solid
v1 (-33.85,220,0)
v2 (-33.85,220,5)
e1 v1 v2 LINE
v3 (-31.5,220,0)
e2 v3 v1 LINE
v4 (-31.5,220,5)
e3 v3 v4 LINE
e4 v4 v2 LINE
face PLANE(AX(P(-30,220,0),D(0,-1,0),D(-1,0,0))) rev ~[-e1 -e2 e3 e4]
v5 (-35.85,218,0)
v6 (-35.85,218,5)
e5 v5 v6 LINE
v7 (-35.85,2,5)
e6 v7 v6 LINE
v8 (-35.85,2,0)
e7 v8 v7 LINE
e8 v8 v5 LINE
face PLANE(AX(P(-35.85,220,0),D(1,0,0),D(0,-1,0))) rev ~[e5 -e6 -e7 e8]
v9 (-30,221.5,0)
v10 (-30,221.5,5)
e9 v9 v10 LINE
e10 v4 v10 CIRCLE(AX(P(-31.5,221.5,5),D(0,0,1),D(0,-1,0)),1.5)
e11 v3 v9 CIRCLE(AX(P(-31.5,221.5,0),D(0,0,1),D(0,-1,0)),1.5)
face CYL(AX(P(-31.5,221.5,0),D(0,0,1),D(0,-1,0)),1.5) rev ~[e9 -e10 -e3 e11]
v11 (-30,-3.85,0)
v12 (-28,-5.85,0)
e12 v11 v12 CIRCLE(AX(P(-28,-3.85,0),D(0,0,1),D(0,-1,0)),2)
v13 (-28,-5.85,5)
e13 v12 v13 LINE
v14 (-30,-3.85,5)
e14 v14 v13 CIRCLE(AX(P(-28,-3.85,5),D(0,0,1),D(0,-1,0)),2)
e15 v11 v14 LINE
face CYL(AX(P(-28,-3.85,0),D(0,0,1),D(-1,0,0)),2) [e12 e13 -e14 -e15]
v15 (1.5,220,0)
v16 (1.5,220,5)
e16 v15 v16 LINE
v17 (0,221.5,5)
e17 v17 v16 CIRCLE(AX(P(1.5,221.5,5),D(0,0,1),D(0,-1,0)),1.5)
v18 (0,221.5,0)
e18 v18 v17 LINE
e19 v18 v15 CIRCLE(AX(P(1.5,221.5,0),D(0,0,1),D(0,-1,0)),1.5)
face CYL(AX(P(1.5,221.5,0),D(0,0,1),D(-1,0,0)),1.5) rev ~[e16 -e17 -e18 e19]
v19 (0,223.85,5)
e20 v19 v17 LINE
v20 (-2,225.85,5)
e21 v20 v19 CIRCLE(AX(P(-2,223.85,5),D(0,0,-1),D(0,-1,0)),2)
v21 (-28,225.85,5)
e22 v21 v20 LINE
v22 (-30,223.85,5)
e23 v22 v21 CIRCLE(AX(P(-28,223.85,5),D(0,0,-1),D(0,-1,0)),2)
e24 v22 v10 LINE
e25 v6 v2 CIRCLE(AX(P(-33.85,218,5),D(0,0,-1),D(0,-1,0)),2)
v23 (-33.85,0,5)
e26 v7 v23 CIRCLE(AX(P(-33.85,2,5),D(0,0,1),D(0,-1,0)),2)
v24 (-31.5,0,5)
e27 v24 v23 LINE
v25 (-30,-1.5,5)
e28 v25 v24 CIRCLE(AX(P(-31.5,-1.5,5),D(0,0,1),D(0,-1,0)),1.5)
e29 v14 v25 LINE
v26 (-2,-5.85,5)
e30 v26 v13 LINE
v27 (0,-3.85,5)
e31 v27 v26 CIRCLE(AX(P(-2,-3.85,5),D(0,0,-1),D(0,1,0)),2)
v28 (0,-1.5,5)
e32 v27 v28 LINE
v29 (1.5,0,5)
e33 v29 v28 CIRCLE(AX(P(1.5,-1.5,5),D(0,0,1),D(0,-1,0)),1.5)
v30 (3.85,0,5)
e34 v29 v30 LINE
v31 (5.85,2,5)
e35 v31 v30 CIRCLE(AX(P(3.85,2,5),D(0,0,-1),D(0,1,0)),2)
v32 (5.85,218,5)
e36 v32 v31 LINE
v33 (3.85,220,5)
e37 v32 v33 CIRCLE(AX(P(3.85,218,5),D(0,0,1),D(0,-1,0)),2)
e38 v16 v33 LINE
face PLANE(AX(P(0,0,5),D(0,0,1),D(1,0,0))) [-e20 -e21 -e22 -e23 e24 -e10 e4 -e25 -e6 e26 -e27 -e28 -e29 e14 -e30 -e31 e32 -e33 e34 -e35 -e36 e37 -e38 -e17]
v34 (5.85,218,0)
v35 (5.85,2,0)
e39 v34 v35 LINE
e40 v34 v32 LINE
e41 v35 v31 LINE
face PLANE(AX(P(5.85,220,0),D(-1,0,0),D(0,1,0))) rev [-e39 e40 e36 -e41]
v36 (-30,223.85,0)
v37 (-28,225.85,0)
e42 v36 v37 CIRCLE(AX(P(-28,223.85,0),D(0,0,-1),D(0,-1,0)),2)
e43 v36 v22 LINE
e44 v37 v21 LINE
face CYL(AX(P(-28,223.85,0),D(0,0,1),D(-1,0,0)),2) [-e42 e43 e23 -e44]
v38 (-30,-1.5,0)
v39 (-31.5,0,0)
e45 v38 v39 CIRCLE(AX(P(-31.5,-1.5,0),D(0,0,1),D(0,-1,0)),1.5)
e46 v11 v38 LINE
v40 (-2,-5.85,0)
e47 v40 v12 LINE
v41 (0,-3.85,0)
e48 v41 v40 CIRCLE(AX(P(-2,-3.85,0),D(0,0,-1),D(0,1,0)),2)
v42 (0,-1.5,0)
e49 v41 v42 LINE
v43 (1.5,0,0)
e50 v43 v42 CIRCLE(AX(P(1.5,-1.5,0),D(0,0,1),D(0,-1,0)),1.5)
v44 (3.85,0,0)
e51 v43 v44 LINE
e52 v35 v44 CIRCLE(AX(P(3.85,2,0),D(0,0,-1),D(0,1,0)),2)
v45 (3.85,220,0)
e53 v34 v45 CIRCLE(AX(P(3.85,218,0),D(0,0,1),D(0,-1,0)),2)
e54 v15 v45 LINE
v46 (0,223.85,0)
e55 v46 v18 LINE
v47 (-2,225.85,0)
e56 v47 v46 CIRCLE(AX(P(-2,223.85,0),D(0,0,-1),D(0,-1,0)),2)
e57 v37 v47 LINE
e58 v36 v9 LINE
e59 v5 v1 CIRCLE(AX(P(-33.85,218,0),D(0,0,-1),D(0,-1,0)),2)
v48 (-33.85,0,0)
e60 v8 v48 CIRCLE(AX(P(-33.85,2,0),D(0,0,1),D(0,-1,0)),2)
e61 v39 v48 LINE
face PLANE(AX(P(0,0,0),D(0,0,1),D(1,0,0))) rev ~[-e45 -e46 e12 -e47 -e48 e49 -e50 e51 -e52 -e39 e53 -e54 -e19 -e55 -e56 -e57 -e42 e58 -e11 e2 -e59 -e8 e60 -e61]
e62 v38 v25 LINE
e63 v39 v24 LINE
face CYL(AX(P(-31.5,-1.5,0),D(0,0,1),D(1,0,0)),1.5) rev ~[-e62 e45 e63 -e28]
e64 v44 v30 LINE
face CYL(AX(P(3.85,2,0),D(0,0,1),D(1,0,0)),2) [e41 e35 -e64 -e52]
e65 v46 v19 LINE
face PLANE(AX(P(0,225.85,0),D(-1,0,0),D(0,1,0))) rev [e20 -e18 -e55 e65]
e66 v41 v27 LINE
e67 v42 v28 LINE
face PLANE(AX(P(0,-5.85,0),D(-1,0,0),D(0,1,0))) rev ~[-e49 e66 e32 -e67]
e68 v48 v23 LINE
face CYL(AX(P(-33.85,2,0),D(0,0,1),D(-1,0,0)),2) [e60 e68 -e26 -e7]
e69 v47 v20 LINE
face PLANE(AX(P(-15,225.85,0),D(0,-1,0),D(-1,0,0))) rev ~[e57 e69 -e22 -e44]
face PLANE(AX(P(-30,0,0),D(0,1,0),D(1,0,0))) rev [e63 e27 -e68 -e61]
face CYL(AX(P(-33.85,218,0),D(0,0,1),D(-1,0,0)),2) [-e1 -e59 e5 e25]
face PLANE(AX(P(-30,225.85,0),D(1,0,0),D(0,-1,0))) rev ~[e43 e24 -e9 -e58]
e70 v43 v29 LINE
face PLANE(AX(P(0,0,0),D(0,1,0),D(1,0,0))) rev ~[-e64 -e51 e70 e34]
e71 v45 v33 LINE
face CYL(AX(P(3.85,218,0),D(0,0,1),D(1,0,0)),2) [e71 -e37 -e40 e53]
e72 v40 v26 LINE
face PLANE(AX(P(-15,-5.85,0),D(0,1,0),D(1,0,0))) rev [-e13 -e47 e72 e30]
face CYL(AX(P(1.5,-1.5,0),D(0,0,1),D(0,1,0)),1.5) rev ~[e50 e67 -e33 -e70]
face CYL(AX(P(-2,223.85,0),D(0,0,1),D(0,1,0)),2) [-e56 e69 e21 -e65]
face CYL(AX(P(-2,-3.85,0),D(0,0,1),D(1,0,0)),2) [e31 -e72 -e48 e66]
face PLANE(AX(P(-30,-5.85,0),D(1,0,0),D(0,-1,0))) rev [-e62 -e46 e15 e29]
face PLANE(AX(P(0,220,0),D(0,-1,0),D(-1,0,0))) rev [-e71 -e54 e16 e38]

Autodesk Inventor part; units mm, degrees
ref_plane "YZ Plane" through (0, 0, 0) normal (1, 0, 0) x (0, 1, 0)
ref_plane "XZ Plane" through (0, 0, 0) normal (0, 1, 0) x (-1, 0, 0)
ref_plane "XY Plane" through (0, 0, 0) normal (0, 0, 1) x (1, 0, 0)
sketch "Skizze3" plane through (0, 0, 0) normal (0, 0, 1) x (1, 0, 0)
  line L0 (0, 0) -> (-30, 0)
  line L1 (-30, 0) -> (-30, 220)
  line L2 (-30, 220) -> (0, 220)
  line L3 (0, 220) -> (0, 0)
  line L4 (-30, 220) -> (-35.85, 220)
  line L5 (-35.85, 220) -> (-35.85, 110)
  line L6 (-35.85, 110) -> (-30, 110)
  line L7 (-30, 110) -> (-30, 220)
  line L8 (-30, 220) -> (-15, 220)
  line L9 (-15, 220) -> (-15, 225.85)
  line L10 (-15, 225.85) -> (-30, 225.85)
  line L11 (-30, 225.85) -> (-30, 220)
  point P0 (-30, 110)
  point P1 (-15, 220)
  dimension "d4" = 220
  dimension "d5" = 30
  dimension "d6" = 5.85
  dimension "d8" = 5.85
extrude "Extrusion3" add sketch "Skizze3" along normal blind 5 contours L0 L1 L2 L3
extrude "Extrusion4" add sketch "Skizze3" along normal blind 5 contours L6 L5 L4 L1 | L2 L11 L10 L9
fillet "Rundung1" radius 2 2 edges at (-35.85, 220, 2.5) (-30, 225.85, 2.5)
mirror "Spiegeln1" about plane through (-15, 220, 0) normal (1, 0, 0) of "Extrusion4", "Rundung1"
mirror "Spiegeln2" about plane through (5.85, 110, 0) normal (0, -1, 0) of "Extrusion4", "Rundung1", "Spiegeln1"
fillet "Rundung2" radius 1.5 4 edges at (0, 0, 2.5) (-30, 0, 2.5) (-30, 220, 2.5) (0, 220, 2.5)
equation "\"d8\" = d6"
properties part number "BT704_trajan20_21" material "Acryl"
